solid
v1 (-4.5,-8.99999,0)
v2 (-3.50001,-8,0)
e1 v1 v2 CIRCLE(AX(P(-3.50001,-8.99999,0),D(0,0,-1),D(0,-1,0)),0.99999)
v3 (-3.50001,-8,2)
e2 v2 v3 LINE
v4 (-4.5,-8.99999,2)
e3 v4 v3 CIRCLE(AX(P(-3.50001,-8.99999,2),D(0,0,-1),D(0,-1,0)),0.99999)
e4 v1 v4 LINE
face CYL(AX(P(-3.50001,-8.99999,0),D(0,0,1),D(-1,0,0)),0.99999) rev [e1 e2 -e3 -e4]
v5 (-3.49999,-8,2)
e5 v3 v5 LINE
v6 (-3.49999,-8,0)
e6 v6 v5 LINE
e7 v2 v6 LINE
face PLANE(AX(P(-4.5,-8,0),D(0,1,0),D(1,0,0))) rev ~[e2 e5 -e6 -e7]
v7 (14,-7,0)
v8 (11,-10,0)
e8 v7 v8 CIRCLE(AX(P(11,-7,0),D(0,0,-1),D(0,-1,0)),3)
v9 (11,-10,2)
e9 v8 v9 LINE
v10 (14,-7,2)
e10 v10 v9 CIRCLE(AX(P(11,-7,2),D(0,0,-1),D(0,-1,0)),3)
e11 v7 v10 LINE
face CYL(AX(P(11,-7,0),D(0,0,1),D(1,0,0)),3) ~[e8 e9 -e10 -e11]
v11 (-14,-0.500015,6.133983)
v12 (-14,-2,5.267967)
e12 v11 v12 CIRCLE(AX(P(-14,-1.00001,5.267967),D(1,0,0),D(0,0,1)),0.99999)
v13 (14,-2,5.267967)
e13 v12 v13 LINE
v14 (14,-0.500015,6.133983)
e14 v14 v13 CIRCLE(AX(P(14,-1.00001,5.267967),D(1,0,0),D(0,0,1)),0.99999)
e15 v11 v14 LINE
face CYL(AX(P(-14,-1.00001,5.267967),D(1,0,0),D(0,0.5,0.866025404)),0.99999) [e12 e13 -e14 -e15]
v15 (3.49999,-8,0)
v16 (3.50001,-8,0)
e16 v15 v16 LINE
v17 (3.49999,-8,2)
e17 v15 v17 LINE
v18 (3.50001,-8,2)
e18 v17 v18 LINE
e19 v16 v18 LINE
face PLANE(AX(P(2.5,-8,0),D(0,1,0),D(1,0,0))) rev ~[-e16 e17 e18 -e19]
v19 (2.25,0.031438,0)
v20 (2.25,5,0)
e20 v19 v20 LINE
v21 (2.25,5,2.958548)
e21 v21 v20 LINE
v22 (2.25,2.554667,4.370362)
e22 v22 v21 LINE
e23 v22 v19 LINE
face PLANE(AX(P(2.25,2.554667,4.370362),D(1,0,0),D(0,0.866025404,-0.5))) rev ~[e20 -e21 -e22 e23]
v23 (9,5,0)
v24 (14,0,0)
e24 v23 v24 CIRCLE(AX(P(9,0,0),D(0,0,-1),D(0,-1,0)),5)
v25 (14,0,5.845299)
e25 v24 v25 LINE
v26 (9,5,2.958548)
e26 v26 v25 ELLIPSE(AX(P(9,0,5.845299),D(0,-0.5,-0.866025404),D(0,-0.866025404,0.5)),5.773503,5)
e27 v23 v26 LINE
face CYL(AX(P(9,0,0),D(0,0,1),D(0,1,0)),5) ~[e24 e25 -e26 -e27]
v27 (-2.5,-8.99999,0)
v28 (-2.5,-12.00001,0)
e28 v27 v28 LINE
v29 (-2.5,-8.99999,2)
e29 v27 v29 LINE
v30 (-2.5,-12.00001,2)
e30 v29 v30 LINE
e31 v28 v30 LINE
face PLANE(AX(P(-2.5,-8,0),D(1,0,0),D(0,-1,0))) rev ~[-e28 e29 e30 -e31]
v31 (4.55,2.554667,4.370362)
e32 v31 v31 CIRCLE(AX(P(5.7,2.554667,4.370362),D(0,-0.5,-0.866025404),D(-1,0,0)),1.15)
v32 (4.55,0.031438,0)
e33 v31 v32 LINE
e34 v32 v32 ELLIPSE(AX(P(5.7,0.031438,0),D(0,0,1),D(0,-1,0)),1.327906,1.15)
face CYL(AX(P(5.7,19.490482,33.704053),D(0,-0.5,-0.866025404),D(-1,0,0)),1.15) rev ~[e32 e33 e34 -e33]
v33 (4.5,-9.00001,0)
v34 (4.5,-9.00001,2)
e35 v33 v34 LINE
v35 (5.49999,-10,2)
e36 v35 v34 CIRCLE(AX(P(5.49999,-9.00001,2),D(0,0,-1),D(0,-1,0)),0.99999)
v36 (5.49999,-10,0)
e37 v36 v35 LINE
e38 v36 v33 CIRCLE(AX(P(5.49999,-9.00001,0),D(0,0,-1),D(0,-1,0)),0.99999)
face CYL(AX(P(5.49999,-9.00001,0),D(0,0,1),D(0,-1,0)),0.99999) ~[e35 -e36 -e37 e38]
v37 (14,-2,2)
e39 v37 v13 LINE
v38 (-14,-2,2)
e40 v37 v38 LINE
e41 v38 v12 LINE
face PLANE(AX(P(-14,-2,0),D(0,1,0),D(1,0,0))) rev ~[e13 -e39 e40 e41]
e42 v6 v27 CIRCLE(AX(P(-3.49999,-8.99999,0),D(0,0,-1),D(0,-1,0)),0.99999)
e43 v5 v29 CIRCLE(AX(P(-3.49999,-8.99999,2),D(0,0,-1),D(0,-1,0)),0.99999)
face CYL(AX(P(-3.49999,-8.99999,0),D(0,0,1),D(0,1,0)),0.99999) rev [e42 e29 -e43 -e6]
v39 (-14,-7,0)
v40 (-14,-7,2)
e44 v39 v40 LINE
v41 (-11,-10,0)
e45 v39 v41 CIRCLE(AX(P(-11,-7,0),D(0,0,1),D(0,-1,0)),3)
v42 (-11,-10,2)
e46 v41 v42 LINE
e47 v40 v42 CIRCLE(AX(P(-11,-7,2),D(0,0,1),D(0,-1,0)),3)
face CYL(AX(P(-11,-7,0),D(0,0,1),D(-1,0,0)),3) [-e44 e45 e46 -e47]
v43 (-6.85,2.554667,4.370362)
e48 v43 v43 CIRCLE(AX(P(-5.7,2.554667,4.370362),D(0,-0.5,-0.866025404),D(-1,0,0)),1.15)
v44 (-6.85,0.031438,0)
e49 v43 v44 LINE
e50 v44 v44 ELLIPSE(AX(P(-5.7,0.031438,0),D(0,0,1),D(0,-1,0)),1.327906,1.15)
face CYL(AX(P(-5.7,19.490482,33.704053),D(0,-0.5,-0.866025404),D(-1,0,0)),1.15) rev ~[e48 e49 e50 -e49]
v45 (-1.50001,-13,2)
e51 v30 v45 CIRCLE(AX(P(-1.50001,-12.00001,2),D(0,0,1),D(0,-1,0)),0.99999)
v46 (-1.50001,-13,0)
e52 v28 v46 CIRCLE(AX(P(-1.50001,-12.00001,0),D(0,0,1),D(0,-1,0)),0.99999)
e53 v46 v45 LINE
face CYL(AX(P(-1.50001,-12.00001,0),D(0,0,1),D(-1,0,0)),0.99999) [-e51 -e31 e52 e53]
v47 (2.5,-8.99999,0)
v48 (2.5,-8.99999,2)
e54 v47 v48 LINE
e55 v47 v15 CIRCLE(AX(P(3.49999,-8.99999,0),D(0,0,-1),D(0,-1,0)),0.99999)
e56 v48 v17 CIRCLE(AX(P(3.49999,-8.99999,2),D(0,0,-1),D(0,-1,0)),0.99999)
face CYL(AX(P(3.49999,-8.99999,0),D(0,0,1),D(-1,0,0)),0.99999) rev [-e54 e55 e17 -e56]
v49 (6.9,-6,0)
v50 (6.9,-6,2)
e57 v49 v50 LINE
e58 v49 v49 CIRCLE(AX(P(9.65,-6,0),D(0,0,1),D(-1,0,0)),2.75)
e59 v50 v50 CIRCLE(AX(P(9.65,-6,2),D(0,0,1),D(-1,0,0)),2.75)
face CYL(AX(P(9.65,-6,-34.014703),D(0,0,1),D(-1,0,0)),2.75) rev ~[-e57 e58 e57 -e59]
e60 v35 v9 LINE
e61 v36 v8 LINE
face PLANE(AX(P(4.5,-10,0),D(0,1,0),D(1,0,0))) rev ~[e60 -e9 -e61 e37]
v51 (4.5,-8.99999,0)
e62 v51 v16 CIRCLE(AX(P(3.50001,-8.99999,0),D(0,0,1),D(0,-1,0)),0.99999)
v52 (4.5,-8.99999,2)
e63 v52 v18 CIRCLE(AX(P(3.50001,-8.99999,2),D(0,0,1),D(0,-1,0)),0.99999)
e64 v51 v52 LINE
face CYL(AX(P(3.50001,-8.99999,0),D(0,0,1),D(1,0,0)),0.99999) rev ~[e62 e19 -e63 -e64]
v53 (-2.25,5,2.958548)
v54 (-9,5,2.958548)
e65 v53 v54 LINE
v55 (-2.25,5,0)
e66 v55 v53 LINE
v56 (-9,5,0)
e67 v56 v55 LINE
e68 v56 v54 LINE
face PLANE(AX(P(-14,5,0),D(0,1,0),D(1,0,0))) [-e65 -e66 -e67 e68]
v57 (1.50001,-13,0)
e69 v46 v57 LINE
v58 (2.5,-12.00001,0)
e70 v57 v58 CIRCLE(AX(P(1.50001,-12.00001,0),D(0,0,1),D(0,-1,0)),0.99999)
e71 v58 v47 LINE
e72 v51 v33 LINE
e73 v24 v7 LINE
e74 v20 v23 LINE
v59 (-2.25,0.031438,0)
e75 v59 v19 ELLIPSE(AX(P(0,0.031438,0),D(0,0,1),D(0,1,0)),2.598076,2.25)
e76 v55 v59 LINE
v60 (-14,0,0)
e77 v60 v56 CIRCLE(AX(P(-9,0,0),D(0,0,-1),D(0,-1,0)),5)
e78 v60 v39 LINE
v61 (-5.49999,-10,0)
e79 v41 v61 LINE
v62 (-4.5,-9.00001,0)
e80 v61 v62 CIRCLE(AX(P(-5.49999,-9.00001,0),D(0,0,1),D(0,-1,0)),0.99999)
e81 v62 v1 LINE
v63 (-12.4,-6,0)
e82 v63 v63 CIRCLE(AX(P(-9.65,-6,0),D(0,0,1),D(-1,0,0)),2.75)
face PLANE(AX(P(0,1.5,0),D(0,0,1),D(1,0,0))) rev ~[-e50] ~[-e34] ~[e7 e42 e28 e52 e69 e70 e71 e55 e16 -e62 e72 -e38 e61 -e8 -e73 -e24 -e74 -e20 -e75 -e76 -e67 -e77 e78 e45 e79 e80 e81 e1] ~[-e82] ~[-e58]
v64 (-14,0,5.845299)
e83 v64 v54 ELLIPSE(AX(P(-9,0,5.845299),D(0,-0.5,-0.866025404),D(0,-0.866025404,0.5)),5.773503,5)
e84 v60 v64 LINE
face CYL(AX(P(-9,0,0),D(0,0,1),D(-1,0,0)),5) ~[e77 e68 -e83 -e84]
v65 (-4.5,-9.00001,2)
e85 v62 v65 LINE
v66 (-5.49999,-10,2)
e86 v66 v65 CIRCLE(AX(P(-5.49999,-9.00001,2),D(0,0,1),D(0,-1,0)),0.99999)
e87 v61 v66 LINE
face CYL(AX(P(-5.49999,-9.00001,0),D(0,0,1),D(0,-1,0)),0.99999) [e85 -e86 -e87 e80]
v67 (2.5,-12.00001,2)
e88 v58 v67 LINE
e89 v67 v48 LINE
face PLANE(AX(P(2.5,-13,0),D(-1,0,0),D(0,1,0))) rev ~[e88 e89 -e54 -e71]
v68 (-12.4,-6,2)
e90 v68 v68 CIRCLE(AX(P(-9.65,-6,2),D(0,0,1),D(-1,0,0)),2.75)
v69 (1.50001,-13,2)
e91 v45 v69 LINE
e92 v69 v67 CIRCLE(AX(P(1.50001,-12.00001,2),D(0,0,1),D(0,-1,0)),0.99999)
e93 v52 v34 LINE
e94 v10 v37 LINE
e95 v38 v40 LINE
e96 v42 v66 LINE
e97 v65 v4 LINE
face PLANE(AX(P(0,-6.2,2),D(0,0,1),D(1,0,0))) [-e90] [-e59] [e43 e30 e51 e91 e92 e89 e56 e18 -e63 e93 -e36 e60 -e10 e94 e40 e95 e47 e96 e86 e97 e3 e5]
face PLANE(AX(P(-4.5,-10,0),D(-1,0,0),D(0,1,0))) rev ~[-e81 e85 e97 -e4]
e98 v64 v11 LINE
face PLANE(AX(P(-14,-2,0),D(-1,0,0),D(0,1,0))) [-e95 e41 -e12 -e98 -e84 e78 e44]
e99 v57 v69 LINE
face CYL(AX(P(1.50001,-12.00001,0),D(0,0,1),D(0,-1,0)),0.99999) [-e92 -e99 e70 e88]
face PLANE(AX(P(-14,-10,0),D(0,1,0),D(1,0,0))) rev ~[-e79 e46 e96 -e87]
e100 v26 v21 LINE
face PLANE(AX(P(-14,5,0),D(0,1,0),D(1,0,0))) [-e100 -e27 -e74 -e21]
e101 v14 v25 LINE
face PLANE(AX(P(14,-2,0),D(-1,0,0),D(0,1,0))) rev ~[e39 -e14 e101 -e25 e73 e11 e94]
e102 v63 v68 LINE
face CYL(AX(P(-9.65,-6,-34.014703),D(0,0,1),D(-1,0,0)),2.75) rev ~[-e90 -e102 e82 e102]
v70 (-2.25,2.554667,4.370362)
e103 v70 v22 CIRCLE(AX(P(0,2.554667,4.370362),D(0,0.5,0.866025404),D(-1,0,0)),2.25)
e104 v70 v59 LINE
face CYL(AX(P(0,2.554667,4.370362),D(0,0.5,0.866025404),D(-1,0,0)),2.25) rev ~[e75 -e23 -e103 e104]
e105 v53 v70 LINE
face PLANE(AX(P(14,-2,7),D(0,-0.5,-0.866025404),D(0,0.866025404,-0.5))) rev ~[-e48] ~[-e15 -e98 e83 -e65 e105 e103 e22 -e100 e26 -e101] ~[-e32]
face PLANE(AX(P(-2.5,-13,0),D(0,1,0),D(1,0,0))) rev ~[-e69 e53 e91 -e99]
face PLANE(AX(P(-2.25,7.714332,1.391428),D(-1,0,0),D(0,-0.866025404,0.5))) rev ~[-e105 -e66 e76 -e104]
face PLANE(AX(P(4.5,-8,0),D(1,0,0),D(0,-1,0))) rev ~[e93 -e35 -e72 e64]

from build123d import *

# Parameters (mm, degrees)
F0_W      = 5
F0_H      = 3
F1_DEPTH  = 2
F0_W_2    = 28
F0_H_2    = 7
F2_DEPTH  = 7
F3_D      = 5.5
F5_DEPTH  = 28.001
F6_R      = 3
F7_R      = 5
F8_R      = 0.99999
F9_W      = 4.5
F9_H      = 3.1342408076
F10_DEPTH = 25
F11_D     = 2.3


# Not quite as in the source:
# - a fillet or chamfer is up to 0.001 mm smaller than in the source, because OpenCascade refuses the exact size


with BuildPart() as f1:
    # F0 (on Top) → F1 (new body)
    with BuildSketch(Plane.XY):
        Polygon((-14, -2), (-14, -10), (-4.5, -10), (-4.5, -8), (-2.5, -8), (-2.5, -10), (2.5, -10), (2.5, -8), (4.5, -8), (4.5, -10), (14, -10), (14, -2), align=None)
        with Locations((0, -11.5)):
            Rectangle(F0_W, F0_H)
    extrude(amount=F1_DEPTH)

    # F0 (on Top) → F2 (join)
    with BuildSketch(Plane.XY):
        with Locations((0, 1.5)):
            Rectangle(F0_W_2, F0_H_2)
    extrude(amount=F2_DEPTH)

    # F3 (through all)
    with Locations(Plane(origin=(0, 0, 0), x_dir=(1, 0, 0), z_dir=(0, 0, -1))):
        with Locations((-9.65, 6), (9.65, 6)):
            Hole(F3_D / 2)

    # F4 (on face) → F5 (cut, through all)
    with BuildSketch(Plane.YZ.offset(14)):
        Polygon((5, 7), (-2, 7), (5, 2.9585481157), align=None)
    extrude(amount=-F5_DEPTH, mode=Mode.SUBTRACT)

    # F6
    f6_edges = [f1.edges().sort_by_distance(p)[0] for p in [
        (-14, -10, 1),
        (14, -10, 1),
    ]]
    fillet(f6_edges, radius=F6_R)

    # F7
    f7_edges = [f1.edges().sort_by_distance(p)[0] for p in [
        (14, 5, 1.479274),
        (-14, 5, 1.479274),
    ]]
    fillet(f7_edges, radius=F7_R)

    # F8 (radius 1 in the source; OpenCascade refuses exactly that, so slightly less here)
    f8_edges = [f1.edges().sort_by_distance(p)[0] for p in [
        (0, -2, 7),
        (-4.5, -8, 1),
        (-2.5, -8, 1),
        (2.5, -8, 1),
        (4.5, -8, 1),
        (4.5, -10, 1),
        (-4.5, -10, 1),
        (-2.5, -13, 1),
        (2.5, -13, 1),
    ]]
    fillet(f8_edges, radius=F8_R)

    # F9 (on face) → F10 (cut)
    with BuildSketch(Plane(origin=(0, 2.5310889132, 4.3839745962), x_dir=(1, 0, 0), z_dir=(0, 0.5, 0.8660254038))):
        with BuildLine():
            Line((2.25, 2.8508529611), (-2.25, 2.8508529611))
            Line((-2.25, 2.8508529611), (-2.25, 0.0272258071))
            ThreePointArc((-2.25, 0.0272258071), (0, -2.2227741929), (2.25, 0.0272258071))
            Line((2.25, 0.0272258071), (2.25, 2.8508529611))
        make_face()
        with Locations((0, 4.4179733649)):
            Rectangle(F9_W, F9_H)
    extrude(amount=-F10_DEPTH, mode=Mode.SUBTRACT)

    # F11 (through all)
    with Locations(Plane(origin=(0, 2.5310889132, 4.3839745962), x_dir=(1, 0, 0), z_dir=(0, 0.5, 0.8660254038))):
        with Locations((5.7, 0.0272258071), (-5.7, 0.0272258071)):
            Hole(F11_D / 2)


solid = f1.part
